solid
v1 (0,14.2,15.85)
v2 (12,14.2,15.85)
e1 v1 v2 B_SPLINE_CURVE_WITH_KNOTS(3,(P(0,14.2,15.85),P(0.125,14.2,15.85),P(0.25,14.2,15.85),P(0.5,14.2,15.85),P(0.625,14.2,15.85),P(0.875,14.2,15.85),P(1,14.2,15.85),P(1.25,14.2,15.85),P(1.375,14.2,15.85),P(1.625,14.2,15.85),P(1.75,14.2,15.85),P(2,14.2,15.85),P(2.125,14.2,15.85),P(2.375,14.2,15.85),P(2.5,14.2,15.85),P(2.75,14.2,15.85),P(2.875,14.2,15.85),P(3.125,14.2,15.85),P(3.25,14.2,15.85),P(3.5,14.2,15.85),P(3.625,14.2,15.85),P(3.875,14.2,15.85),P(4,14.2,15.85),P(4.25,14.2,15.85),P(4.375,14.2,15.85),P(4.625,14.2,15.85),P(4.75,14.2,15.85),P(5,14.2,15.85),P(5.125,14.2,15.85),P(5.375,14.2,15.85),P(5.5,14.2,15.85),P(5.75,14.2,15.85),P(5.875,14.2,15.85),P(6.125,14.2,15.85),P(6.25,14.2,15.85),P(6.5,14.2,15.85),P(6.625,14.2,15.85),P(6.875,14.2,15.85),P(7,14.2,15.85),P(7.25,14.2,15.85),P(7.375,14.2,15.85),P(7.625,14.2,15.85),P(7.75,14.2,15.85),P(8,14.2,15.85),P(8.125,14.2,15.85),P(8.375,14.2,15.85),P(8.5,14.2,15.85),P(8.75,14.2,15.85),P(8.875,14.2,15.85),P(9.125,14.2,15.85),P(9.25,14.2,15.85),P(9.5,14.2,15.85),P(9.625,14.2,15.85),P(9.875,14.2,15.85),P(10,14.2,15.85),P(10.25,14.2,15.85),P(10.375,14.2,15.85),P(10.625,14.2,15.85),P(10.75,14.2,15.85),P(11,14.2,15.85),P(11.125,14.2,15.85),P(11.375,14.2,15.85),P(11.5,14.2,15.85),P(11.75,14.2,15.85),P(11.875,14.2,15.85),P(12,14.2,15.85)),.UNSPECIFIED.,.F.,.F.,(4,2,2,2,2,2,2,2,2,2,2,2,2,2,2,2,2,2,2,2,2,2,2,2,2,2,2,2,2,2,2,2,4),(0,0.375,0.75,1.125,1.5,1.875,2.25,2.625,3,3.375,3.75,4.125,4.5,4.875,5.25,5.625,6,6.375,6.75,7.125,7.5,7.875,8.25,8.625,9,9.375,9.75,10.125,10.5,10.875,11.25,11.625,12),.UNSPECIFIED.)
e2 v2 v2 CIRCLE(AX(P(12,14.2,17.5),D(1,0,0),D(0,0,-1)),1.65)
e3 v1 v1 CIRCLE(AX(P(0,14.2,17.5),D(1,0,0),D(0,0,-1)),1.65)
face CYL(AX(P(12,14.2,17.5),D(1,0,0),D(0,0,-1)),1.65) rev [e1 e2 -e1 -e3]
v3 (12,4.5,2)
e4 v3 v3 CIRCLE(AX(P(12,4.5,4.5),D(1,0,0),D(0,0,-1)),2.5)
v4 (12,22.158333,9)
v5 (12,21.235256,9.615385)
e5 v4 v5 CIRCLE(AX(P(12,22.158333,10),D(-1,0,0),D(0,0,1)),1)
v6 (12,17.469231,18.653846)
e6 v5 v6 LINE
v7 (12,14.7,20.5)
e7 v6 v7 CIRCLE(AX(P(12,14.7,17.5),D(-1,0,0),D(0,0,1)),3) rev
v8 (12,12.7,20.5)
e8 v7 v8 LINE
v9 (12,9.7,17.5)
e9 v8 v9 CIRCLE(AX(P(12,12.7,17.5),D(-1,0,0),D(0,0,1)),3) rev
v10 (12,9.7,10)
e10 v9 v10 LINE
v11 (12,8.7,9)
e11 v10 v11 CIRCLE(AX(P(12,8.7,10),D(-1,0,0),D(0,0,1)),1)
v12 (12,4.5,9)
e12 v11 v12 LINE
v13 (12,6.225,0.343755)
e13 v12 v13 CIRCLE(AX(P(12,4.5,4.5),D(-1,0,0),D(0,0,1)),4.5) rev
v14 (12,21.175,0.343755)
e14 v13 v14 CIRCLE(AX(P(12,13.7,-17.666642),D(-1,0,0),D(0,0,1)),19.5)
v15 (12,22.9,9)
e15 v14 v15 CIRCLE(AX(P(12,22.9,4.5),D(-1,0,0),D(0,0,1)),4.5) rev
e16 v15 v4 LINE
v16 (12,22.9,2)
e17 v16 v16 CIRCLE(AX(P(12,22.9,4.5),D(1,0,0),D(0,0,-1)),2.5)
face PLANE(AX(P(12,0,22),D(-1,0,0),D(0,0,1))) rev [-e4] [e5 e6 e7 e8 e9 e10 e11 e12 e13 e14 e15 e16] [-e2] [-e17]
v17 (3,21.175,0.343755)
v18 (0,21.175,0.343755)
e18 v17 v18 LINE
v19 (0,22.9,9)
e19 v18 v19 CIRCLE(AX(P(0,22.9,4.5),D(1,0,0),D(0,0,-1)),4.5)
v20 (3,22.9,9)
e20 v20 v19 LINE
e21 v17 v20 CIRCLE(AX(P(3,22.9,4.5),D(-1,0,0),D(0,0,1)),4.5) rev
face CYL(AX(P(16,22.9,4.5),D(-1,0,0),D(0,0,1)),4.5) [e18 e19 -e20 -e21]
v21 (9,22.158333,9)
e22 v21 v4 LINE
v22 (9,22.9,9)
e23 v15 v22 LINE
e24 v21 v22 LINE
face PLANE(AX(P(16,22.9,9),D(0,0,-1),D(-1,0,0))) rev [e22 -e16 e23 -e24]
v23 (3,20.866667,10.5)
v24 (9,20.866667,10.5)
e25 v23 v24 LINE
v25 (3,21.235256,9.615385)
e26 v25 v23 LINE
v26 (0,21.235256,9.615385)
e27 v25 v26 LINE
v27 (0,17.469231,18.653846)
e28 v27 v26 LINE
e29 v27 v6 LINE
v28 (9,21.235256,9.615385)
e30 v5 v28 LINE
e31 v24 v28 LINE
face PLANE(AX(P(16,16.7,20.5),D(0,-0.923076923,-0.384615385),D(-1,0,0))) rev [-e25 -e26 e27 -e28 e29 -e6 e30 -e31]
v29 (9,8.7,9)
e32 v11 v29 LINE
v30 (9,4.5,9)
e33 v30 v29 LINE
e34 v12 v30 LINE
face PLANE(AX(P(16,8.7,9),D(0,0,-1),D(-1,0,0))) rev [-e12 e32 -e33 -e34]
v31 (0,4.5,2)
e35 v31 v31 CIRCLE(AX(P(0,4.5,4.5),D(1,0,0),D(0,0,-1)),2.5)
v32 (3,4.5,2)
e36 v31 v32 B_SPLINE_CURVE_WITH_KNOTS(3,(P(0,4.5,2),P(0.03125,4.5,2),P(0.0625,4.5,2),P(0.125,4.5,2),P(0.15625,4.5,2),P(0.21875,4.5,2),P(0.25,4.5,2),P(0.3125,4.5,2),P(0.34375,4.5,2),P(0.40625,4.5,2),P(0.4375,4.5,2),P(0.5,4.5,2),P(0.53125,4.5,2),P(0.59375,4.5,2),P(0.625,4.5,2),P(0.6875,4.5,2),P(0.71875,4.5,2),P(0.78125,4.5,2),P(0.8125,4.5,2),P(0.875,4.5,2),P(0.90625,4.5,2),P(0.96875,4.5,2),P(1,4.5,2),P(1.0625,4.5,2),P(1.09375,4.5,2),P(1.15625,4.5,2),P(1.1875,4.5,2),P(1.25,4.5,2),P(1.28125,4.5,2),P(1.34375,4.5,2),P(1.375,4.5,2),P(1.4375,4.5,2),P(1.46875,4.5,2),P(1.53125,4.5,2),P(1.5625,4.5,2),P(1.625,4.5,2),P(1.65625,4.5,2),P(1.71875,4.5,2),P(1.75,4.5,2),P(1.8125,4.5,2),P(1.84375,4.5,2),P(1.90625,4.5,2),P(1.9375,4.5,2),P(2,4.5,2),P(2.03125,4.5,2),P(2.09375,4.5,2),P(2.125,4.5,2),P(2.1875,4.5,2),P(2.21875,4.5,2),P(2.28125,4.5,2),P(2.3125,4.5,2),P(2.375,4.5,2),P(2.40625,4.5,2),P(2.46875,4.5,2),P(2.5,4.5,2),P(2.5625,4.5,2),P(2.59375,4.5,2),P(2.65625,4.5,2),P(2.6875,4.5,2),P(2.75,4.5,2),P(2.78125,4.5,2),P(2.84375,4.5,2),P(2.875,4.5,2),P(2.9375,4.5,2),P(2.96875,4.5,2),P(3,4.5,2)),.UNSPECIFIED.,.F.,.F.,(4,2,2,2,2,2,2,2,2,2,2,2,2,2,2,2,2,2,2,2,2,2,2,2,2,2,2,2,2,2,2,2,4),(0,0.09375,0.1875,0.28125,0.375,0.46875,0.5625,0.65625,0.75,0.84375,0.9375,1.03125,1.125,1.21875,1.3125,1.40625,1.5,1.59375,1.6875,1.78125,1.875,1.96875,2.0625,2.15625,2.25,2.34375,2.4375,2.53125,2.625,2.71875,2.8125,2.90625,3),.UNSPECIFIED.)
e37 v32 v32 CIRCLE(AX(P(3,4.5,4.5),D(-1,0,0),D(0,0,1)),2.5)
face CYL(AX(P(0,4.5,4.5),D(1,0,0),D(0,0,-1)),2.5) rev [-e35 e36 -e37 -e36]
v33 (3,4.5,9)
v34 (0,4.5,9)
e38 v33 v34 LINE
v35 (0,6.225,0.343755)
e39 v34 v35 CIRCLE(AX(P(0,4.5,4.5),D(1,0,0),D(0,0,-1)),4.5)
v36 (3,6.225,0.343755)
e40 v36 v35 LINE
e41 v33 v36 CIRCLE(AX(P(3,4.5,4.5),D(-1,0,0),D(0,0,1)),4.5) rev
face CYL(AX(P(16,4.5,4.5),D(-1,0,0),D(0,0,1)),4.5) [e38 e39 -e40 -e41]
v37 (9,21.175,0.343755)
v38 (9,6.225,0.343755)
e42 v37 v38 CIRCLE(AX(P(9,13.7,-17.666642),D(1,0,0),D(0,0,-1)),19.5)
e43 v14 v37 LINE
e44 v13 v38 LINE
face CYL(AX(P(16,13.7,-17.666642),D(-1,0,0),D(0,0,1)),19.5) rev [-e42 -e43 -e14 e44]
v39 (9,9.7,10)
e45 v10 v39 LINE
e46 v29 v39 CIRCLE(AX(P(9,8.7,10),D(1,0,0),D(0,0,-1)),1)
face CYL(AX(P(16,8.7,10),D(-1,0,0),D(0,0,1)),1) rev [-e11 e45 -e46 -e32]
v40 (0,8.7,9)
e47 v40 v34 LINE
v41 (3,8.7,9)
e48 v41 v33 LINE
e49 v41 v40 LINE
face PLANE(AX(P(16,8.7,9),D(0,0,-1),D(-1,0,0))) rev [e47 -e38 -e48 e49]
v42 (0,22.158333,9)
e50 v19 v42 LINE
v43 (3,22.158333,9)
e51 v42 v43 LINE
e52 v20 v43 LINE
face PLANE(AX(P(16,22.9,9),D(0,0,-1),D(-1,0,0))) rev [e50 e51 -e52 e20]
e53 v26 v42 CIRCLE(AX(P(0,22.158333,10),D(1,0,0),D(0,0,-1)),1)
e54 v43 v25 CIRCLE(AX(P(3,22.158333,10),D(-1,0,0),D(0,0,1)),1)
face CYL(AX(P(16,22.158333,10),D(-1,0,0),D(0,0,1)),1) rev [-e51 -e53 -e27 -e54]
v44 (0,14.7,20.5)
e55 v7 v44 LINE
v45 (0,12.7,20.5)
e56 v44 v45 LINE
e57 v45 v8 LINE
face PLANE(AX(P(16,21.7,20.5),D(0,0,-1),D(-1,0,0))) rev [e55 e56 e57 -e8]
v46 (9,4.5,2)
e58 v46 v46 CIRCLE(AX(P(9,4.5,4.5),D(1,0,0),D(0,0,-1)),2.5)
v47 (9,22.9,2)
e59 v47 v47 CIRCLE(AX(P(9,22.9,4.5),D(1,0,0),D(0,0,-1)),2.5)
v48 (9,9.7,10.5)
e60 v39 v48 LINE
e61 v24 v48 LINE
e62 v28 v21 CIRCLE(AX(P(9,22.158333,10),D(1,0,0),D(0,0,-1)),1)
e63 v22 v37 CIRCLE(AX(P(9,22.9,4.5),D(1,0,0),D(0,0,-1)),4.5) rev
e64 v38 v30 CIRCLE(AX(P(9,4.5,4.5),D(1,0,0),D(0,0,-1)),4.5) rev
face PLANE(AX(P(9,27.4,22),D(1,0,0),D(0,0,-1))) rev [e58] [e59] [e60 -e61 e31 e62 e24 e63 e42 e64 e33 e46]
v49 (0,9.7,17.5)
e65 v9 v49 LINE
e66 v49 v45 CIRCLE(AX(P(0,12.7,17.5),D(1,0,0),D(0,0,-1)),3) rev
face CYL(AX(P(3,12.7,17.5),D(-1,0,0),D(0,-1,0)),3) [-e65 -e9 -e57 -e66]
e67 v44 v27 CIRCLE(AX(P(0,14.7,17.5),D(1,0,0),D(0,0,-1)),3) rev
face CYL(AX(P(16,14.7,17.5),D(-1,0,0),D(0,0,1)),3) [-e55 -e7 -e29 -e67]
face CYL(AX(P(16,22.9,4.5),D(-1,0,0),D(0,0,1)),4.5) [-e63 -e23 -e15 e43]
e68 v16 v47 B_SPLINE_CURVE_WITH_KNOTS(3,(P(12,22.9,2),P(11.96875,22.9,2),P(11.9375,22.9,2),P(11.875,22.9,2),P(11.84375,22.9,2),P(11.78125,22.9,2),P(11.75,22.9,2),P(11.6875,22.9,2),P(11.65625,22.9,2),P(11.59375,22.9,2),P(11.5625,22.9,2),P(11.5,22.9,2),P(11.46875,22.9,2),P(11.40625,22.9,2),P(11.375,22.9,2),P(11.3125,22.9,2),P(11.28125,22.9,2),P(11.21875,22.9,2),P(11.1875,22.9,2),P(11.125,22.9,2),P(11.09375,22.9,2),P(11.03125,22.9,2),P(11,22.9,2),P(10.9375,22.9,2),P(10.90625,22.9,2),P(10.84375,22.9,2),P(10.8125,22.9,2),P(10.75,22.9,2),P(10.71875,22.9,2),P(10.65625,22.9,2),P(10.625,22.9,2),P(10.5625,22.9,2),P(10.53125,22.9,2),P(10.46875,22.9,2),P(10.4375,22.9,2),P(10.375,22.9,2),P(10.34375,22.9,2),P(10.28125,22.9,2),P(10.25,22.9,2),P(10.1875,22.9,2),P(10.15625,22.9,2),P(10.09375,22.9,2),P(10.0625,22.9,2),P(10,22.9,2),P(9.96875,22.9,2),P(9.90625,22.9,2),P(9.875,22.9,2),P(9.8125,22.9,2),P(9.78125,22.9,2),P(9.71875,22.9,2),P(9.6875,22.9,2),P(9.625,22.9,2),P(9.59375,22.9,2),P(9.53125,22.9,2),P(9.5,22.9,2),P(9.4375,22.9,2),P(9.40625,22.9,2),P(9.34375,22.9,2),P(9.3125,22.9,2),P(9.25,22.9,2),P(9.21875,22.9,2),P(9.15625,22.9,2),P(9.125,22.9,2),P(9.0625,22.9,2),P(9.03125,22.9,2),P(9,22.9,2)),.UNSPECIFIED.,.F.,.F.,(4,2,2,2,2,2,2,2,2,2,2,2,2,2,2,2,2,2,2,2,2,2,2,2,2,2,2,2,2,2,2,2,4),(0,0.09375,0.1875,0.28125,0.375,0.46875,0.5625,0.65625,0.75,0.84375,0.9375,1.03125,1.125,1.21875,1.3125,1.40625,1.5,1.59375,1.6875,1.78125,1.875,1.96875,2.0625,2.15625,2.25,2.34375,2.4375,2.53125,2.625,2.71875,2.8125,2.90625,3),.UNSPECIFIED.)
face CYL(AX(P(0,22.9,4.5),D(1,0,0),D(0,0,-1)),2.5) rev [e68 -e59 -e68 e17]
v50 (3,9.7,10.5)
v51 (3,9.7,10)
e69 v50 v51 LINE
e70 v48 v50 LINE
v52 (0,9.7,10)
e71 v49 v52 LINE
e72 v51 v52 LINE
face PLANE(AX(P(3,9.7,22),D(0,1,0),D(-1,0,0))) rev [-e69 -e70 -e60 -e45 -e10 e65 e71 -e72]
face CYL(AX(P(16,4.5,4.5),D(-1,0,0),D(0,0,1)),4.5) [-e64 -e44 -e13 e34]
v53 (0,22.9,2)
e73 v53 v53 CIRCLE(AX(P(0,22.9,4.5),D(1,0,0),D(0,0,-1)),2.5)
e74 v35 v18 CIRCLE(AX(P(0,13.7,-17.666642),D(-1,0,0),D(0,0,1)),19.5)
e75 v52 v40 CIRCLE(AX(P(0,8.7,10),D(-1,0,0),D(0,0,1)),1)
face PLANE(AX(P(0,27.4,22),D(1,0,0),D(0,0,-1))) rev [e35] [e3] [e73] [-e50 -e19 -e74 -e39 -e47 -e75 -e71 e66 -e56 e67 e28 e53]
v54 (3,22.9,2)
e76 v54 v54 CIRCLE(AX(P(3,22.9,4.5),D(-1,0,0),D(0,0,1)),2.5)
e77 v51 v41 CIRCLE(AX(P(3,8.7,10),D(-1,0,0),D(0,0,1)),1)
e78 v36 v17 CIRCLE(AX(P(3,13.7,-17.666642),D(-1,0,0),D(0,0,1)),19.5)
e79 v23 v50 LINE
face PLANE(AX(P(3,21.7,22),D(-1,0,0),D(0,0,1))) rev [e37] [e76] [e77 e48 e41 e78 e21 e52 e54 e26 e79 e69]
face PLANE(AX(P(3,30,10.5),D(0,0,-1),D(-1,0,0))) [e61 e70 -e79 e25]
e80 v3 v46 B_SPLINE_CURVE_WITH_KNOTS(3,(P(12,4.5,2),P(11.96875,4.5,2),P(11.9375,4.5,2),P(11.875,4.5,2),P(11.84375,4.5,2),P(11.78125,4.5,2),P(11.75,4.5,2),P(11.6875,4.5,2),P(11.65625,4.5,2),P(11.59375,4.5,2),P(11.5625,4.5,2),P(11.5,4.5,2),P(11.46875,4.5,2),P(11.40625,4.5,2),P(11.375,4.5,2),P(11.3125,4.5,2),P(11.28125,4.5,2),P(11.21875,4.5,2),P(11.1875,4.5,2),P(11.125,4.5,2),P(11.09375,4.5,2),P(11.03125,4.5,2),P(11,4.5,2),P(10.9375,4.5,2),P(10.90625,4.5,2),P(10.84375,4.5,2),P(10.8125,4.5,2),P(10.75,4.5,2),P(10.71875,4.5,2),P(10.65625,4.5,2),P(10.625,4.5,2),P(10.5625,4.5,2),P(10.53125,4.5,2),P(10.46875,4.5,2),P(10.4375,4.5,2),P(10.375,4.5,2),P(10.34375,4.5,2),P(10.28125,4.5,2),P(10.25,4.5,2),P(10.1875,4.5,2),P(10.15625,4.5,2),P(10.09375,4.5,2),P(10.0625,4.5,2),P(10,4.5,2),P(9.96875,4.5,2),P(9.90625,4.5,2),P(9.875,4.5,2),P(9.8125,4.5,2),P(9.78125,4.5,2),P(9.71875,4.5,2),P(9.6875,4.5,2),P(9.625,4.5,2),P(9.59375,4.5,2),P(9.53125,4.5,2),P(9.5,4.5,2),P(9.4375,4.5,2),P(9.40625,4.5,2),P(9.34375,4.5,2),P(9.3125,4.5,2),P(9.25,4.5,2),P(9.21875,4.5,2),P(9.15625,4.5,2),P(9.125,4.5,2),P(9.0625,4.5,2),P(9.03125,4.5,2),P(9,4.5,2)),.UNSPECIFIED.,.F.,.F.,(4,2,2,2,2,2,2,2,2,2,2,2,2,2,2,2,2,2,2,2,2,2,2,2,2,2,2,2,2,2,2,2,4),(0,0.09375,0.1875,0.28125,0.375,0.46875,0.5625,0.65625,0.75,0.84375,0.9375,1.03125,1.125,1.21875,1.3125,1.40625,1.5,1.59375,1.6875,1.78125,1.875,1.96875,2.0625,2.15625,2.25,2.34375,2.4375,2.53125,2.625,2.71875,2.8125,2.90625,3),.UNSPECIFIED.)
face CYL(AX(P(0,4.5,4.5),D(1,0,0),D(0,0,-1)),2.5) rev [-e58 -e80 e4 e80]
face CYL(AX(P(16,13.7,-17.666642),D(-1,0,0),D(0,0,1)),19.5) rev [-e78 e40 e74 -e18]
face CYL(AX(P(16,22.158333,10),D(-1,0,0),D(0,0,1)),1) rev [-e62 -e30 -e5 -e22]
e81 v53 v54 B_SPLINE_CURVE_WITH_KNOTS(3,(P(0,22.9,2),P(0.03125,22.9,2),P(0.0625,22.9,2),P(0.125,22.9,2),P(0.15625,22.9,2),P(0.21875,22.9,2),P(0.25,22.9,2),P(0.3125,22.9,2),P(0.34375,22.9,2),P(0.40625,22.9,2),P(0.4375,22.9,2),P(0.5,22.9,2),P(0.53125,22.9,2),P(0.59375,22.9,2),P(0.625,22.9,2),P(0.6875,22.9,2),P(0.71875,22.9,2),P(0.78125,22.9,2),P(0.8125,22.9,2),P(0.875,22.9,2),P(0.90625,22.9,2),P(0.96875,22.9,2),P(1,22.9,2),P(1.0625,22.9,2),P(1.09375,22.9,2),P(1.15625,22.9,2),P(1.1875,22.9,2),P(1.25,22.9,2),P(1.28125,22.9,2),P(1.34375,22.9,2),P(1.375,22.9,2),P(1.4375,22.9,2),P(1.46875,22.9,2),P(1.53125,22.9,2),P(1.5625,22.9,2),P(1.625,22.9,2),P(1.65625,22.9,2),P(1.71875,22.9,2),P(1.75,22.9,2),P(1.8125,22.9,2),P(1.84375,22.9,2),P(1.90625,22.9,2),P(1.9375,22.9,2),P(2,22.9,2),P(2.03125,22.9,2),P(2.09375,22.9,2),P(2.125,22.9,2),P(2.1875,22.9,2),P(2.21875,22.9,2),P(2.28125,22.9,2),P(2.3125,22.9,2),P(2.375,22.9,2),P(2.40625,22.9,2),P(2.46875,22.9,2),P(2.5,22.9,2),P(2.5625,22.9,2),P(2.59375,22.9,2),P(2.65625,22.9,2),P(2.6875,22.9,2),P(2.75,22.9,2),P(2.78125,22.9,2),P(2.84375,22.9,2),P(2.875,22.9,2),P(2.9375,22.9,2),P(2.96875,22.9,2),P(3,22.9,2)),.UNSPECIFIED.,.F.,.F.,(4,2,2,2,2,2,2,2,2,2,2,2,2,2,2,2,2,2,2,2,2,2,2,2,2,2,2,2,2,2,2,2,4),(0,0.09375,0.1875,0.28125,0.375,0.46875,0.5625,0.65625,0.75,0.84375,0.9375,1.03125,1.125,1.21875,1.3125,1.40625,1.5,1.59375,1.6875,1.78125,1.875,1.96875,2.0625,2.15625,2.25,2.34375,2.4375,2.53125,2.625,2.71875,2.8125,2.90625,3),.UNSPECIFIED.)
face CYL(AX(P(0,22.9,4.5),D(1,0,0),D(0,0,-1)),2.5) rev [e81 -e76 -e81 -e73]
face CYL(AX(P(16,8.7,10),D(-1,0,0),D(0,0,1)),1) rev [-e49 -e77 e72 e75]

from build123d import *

# Parameters (mm, degrees)
EXTRUDE_1_DEPTH     = 22
SKETCH_2_W          = 32.061557032
SKETCH_2_H          = 43.504749412
CUT_EXTRUDE_1_DEPTH = 16
SKETCH_3_W          = 6
SKETCH_3_H          = 10.337049688
CUT_EXTRUDE_2_DEPTH = 30
SKETCH_9_R          = 2.5
CUT_EXTRUDE_4_DEPTH = 37.263066611
HOLE_WIZARD_M4_1_D  = 3.3
CHAMFER_1_SIZE      = 12
CHAMFER_1_SIZE_2    = 5
FILLET_2_R          = 3
FILLET_3_R          = 3
FILLET_4_R          = 1


with BuildPart() as part:
    # 草圖1 → 填料-伸長1 (new body)
    with BuildSketch(Plane.XY):
        Polygon((0, 0), (3, 0), (3, 9.7), (9, 9.7), (9, 0), (12, 0), (12, 27.4), (9, 27.4), (9, 21.7), (3, 21.7), (3, 27.4), (0, 27.4), align=None)
    extrude(amount=EXTRUDE_1_DEPTH)

    # 草圖2 → 除料-伸長1 (cut)
    with BuildSketch(Plane(origin=(0, 0, 0), x_dir=(0, 0, -1), z_dir=(1, 0, 0))):
        with Locations((-6.749670429, 14.217142955)):
            Rectangle(SKETCH_2_W, SKETCH_2_H)
        with BuildLine():
            Line((-20.5, 9.7), (-10, 9.7))
            ThreePointArc((-10, 9.7), (-9.292893219, 9.407106781), (-9, 8.7))
            Line((-9, 8.7), (-9, 4.5))
            ThreePointArc((-9, 4.5), (-3.620541034, 0.086775337), (-0.343754699, 6.225))
            ThreePointArc((-0.343754699, 6.225), (-1.833358396, 13.7), (-0.343754699, 21.175))
            ThreePointArc((-0.343754699, 21.175), (-3.620541034, 27.313224663), (-9, 22.9))
            Line((-9, 22.9), (-9, 21.7))
            Line((-9, 21.7), (-20.5, 21.7))
            Line((-20.5, 21.7), (-20.5, 9.7))
        make_face(mode=Mode.SUBTRACT)
    extrude(amount=CUT_EXTRUDE_1_DEPTH, mode=Mode.SUBTRACT)

    # 草圖3 → 除料-伸長2 (cut)
    with BuildSketch(Plane(origin=(0, 0, 0), x_dir=(1, 0, 0), z_dir=(0, 1, 0))):
        with Locations((6, -5.331475156)):
            Rectangle(SKETCH_3_W, SKETCH_3_H)
    extrude(amount=CUT_EXTRUDE_2_DEPTH, mode=Mode.SUBTRACT)

    # 草圖9 → 除料-伸長4 (cut, through all)
    with BuildSketch(Plane(origin=(12, 0, 0), x_dir=(0, 0, -1), z_dir=(1, 0, 0))):
        with Locations((-4.5, 4.5)):
            Circle(SKETCH_9_R)
        with Locations((-4.5, 22.9)):
            Circle(SKETCH_9_R)
    extrude(amount=-CUT_EXTRUDE_4_DEPTH, mode=Mode.SUBTRACT)

    # M4 螺紋孔1 (through all)
    with Locations(Plane(origin=(12, 0, 0), x_dir=(0, 0, -1), z_dir=(1, 0, 0))):
        with Locations((-17.5, 14.2)):
            Hole(HOLE_WIZARD_M4_1_D / 2)

    # 導角1
    # the kernel refuses this chamfer: 12, 5 mm, written as the material it takes off along each edge
    with BuildSketch(Plane(origin=(43.111115995, 21.7, 20.5), x_dir=(0, 0.014835162506254055, -0.9998899529215268), z_dir=(-1, 0, 0))) as chamfer_1_piece_1_section:
        Polygon((CHAMFER_1_SIZE * 0.999889952922, CHAMFER_1_SIZE * 0.0148351625063), (-CHAMFER_1_SIZE_2 * 0.0148351625063, CHAMFER_1_SIZE_2 * 0.999889952922), (0, 0), align=None)
    chamfer_1_piece_1 = extrude(amount=74.22223199, mode=Mode.PRIVATE)
    chamfer_1_piece_1 = split(chamfer_1_piece_1, bisect_by=Plane(origin=(10.5, 21.408333333, 9), z_dir=(0, 0, 1)), keep=Keep.TOP, mode=Mode.PRIVATE)
    add(chamfer_1_piece_1, mode=Mode.SUBTRACT)

    # 圓角2
    fillet_2_edges = [part.edges().sort_by_distance(p)[0] for p in [
        (6, 9.7, 20.5),
    ]]
    fillet(fillet_2_edges, radius=FILLET_2_R)

    # 圓角3
    fillet_3_edges = [part.edges().sort_by_distance(p)[0] for p in [
        (6, 16.7, 20.5),
    ]]
    fillet(fillet_3_edges, radius=FILLET_3_R)

    # 圓角4
    fillet_4_edges = [part.edges().sort_by_distance(p)[0] for p in [
        (1.5, 21.491666667, 9),
        (10.5, 21.491666667, 9),
    ]]
    fillet(fillet_4_edges, radius=FILLET_4_R)


solid = part.part
